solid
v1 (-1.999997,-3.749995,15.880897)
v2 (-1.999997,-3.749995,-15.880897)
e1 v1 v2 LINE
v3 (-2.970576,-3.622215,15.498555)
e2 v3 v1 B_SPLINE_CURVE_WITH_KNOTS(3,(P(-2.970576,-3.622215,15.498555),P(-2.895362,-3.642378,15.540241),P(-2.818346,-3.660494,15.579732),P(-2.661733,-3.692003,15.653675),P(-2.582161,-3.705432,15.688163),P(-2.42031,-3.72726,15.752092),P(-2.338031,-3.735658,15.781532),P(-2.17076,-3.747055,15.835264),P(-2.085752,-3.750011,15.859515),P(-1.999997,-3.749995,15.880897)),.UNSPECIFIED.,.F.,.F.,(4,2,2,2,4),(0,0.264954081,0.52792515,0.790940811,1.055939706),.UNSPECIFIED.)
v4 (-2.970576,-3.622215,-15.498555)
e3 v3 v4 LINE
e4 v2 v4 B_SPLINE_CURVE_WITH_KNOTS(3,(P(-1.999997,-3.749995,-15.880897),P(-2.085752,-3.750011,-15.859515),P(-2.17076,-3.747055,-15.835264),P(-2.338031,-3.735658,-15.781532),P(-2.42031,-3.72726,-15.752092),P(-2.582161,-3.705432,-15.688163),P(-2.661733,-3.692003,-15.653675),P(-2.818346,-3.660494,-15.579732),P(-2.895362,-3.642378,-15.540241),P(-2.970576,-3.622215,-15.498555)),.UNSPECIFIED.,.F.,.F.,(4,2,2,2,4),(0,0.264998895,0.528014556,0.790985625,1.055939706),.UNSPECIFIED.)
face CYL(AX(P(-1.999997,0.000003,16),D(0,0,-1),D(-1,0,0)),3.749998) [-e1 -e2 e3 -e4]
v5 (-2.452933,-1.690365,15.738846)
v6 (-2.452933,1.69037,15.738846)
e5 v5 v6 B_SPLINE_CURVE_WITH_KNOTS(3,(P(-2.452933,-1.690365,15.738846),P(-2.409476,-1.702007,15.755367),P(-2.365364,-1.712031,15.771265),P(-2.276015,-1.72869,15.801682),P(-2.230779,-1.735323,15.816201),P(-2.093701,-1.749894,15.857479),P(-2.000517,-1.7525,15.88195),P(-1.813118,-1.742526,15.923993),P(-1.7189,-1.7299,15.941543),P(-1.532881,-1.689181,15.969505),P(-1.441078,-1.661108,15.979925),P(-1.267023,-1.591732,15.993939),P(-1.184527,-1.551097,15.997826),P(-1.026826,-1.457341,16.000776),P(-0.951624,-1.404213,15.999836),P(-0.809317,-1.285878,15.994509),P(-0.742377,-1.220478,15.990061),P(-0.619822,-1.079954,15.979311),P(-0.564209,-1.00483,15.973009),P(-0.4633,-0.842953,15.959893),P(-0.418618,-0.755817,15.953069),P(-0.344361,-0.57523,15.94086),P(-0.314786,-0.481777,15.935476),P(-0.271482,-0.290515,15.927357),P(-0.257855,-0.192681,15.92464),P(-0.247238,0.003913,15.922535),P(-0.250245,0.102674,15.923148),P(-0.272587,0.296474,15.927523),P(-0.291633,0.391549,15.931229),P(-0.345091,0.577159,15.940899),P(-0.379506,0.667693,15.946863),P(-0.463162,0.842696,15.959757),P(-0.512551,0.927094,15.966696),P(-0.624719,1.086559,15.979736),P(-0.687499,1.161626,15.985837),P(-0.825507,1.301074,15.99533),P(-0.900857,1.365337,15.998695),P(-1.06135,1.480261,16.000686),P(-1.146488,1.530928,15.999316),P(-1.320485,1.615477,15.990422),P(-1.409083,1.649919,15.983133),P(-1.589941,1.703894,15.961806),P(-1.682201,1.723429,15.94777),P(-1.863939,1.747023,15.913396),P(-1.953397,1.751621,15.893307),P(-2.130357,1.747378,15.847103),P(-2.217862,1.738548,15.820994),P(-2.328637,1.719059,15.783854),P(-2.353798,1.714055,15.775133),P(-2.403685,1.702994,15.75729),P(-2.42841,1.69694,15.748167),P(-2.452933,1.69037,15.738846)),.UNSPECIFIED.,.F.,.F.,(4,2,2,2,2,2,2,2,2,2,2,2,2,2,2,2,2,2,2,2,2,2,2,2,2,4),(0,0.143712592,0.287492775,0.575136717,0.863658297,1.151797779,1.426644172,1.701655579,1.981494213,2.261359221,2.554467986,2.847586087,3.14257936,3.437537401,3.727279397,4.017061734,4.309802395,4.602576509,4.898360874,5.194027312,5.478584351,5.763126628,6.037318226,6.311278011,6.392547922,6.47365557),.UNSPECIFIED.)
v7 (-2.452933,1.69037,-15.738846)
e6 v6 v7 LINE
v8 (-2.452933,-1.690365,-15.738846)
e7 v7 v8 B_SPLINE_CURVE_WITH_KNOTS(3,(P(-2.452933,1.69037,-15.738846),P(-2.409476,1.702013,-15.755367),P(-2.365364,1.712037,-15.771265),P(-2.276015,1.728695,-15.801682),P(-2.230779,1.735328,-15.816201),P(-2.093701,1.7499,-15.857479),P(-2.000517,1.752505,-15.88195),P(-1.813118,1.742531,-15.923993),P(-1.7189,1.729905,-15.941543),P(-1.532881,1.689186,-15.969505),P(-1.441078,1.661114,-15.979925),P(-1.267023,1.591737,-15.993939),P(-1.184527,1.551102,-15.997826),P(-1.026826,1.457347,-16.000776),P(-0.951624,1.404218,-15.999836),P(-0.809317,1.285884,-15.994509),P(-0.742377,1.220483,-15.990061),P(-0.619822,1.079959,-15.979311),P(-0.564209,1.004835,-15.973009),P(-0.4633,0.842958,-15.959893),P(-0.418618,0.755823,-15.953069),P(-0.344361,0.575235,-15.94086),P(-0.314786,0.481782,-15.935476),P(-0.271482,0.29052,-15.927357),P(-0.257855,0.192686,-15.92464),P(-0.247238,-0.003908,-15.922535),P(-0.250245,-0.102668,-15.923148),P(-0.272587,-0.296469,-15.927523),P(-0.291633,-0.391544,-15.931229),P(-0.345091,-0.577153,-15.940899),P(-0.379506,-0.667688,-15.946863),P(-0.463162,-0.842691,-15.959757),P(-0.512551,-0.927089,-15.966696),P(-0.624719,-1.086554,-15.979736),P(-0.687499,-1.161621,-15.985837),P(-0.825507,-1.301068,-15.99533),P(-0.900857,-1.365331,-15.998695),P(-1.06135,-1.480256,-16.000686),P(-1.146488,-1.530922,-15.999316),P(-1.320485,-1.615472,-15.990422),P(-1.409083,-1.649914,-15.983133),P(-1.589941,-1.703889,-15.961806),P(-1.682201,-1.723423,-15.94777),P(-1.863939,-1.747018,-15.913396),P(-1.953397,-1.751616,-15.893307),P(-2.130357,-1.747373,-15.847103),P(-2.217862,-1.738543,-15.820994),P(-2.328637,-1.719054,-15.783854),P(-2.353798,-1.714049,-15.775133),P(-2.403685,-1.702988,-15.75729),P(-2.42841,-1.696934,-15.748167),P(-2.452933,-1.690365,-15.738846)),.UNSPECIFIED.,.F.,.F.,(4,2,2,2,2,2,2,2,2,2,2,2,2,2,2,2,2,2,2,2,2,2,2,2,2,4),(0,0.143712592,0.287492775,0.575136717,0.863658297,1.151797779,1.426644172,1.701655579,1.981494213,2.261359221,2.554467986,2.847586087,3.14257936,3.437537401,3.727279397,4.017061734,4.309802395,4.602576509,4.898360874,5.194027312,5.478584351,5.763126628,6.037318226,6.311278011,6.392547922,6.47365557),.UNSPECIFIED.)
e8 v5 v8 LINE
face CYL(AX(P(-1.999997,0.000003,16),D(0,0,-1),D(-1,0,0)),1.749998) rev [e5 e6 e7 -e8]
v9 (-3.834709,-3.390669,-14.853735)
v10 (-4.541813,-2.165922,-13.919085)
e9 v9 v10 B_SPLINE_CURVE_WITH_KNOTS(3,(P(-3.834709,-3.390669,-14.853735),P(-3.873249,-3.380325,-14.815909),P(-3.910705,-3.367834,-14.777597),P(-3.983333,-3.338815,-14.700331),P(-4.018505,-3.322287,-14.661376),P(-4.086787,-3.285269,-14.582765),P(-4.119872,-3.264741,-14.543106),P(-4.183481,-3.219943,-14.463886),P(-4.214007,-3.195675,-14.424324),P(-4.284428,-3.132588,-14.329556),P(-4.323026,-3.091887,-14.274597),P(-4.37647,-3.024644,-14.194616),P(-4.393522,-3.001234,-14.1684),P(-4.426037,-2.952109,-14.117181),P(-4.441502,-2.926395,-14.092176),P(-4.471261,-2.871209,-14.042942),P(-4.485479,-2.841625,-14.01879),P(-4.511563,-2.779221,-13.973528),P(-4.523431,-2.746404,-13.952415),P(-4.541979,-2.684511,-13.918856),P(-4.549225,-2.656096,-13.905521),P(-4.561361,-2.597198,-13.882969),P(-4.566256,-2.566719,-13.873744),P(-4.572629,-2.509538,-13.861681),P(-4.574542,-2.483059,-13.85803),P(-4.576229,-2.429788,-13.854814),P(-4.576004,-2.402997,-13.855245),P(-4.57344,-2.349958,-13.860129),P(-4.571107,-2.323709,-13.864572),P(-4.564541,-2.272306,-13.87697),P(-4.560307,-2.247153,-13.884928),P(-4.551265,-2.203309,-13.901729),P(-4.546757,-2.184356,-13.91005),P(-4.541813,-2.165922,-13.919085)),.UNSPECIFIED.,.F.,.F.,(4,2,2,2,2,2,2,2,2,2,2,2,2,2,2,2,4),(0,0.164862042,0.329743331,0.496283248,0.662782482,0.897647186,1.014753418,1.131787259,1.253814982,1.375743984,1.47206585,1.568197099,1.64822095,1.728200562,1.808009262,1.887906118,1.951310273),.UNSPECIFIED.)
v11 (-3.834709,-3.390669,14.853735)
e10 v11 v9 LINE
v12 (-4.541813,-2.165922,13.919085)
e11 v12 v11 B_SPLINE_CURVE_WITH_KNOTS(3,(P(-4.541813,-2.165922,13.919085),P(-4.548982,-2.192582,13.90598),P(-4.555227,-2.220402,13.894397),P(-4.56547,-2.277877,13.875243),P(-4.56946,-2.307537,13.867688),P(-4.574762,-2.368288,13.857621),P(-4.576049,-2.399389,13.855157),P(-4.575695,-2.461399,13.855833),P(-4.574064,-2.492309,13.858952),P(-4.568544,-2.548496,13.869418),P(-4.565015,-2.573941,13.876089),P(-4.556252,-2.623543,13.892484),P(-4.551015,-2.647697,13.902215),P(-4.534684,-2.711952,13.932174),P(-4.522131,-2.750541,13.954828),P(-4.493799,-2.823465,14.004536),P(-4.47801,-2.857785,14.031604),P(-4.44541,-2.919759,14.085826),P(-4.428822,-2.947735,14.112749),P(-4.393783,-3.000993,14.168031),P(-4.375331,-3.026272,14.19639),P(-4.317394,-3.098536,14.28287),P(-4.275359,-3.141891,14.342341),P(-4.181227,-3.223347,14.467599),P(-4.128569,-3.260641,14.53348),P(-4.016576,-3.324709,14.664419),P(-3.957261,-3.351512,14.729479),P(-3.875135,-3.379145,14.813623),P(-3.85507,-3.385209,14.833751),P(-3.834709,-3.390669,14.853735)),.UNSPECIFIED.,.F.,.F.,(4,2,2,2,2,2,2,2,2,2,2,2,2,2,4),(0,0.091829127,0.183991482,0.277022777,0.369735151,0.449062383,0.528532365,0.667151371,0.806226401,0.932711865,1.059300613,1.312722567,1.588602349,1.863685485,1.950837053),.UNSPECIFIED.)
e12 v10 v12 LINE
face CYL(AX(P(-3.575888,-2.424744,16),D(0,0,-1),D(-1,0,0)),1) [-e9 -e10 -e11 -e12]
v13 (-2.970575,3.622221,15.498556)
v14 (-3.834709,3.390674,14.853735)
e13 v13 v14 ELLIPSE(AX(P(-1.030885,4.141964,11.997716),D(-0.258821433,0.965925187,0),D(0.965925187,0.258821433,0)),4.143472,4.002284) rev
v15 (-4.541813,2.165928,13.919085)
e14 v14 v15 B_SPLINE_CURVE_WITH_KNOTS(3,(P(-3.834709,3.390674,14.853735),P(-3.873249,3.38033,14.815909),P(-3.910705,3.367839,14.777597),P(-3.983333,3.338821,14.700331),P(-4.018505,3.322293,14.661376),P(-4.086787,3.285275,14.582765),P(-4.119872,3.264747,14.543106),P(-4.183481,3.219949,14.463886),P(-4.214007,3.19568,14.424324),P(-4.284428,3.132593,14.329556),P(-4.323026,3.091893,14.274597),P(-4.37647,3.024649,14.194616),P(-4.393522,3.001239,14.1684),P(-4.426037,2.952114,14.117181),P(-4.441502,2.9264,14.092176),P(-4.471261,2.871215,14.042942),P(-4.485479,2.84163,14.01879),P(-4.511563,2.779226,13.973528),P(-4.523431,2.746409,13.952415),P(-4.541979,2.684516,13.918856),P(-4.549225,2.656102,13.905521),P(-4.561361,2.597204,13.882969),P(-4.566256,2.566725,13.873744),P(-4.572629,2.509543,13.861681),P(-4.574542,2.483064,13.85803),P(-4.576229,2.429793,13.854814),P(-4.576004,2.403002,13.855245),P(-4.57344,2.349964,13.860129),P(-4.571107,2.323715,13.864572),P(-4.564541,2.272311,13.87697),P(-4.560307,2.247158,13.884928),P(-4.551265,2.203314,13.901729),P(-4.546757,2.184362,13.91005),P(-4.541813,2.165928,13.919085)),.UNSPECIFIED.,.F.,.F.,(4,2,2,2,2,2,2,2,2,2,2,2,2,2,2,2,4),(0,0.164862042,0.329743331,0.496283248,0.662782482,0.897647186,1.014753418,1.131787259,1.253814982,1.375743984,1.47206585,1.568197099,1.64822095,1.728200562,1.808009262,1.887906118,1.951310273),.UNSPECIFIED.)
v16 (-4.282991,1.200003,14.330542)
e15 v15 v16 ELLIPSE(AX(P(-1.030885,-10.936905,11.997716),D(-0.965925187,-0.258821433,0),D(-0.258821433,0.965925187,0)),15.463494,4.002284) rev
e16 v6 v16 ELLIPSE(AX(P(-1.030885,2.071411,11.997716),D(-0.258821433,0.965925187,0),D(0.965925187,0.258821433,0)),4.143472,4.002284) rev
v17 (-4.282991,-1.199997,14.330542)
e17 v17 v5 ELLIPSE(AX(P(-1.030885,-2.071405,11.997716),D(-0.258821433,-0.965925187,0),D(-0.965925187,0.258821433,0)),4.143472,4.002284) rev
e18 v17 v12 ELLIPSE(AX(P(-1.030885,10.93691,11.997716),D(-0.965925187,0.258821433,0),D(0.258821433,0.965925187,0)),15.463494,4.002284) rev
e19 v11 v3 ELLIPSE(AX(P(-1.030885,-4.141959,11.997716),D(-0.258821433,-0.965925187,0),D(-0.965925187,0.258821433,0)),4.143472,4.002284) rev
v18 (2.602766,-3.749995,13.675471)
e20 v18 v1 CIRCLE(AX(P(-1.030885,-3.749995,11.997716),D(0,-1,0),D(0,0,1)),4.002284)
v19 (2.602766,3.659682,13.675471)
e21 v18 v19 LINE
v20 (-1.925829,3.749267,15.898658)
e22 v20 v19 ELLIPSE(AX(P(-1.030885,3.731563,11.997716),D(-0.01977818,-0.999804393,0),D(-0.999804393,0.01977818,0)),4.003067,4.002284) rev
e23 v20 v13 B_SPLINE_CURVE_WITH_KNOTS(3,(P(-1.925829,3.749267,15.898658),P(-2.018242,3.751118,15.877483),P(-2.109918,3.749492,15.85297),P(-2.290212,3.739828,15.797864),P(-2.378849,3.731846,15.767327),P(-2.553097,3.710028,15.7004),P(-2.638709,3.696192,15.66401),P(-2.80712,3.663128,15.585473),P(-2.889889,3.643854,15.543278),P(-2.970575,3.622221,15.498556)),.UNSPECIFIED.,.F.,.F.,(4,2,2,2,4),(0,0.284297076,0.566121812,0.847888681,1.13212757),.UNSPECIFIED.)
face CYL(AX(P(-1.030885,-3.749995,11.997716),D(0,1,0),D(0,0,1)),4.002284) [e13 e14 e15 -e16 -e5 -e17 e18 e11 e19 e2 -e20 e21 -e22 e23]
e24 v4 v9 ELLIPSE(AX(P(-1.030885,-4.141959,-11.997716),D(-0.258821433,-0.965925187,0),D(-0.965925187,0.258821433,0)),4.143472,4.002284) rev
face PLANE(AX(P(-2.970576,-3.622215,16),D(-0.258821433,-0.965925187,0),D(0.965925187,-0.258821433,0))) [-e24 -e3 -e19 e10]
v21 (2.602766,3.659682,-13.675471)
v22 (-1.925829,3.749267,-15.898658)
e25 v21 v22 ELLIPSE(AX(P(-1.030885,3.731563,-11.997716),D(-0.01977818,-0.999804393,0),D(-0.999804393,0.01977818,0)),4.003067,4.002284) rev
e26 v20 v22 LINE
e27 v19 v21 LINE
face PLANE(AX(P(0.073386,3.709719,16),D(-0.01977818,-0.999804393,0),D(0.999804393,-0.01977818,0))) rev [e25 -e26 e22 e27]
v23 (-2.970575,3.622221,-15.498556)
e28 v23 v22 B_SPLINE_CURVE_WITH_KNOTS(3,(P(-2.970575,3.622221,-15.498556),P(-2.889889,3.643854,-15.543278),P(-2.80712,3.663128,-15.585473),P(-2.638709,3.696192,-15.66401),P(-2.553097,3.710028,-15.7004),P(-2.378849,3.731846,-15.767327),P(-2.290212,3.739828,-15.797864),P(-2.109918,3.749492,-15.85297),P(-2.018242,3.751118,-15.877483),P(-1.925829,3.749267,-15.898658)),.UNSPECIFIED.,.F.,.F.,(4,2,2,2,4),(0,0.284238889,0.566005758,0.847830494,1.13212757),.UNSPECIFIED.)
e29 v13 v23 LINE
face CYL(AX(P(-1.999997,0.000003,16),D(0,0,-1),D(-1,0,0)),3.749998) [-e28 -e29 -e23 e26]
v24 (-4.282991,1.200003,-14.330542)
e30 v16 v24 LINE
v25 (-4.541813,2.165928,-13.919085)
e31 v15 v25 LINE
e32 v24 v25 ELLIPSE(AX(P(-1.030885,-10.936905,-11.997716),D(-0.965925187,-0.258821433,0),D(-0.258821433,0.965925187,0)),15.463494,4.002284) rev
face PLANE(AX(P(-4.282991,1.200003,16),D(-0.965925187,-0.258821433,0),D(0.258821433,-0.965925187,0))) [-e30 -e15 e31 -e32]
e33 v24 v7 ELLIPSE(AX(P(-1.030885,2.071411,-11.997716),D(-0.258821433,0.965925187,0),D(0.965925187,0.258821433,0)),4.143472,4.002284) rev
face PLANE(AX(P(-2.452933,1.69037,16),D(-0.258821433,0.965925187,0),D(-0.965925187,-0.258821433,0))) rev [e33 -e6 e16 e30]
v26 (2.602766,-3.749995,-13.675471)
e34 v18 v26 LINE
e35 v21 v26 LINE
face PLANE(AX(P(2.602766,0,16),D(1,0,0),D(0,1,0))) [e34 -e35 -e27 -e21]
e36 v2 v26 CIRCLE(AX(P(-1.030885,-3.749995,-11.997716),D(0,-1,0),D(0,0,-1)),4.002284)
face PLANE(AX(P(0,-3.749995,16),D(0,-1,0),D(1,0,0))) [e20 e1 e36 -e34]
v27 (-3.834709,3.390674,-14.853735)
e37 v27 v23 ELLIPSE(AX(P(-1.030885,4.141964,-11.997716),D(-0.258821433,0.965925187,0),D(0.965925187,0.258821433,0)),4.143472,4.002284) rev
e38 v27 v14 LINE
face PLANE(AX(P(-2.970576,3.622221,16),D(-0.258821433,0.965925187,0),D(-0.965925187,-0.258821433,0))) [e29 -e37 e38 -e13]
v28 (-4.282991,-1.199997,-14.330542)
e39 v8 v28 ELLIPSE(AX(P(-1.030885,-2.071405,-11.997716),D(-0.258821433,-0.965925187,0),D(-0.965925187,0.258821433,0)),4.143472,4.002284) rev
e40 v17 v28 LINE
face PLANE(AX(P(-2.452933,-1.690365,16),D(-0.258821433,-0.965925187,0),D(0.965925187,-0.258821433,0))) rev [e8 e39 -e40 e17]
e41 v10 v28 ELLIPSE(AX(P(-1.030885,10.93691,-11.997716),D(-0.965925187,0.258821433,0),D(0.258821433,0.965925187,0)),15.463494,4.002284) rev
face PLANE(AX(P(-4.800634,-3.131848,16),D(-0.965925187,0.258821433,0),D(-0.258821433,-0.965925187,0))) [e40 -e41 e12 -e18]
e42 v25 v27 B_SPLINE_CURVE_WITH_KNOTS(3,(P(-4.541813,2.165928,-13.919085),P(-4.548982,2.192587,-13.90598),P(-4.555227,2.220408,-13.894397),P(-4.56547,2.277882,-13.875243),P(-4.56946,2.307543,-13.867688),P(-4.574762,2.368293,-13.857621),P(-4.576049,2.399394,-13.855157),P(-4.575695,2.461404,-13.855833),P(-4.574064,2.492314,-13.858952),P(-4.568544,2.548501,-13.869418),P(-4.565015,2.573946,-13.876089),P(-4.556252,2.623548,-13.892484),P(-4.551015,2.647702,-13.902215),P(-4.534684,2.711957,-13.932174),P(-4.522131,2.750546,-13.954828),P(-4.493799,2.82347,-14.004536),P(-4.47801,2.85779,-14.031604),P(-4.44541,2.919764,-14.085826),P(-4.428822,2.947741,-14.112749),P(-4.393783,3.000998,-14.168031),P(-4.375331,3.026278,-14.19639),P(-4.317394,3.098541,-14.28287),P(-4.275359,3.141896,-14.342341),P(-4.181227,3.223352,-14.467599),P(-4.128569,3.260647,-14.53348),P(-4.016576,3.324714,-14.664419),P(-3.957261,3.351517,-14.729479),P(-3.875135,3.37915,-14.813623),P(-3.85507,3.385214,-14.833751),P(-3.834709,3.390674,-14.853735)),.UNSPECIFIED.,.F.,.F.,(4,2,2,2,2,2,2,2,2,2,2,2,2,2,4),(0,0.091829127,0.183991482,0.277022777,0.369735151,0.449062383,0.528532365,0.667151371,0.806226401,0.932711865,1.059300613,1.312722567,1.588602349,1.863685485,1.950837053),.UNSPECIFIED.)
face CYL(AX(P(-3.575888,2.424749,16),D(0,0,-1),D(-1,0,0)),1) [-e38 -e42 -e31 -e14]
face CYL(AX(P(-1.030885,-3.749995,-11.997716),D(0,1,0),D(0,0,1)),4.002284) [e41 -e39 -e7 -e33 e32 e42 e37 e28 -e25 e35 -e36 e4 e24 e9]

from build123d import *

# Parameters (mm, degrees)
EXTRUDE_THIN1_DEPTH     = 16
BOSS_EXTRUDE2_DEPTH     = 16
FILLET1_R               = 1
CUT_EXTRUDE2_DEPTH      = 18.058758847
CUT_EXTRUDE2_DEPTH_BACK = 18.058758847


# Read off the part's stored shape, not the designer's step: Imported1
with BuildPart() as part:
    # Sketch2 → Extrude-Thin1 (new, symmetric)
    with BuildSketch(Plane.XY):
        with BuildLine():
            Line((-4.282991407, -1.199997312), (-2.45293323, -1.69036477))
            ThreePointArc((-2.45293323, -1.69036477), (-0.24999913, 2.688e-06), (-2.45293323, 1.690370147))
            Line((-2.45293323, 1.690370147), (-4.282991407, 1.200002688))
            Line((-4.282991407, 1.200002688), (-4.800634272, 3.131853062))
            Line((-4.800634272, 3.131853062), (-2.970575647, 3.62222064))
            ThreePointArc((-2.970575647, 3.62222064), (1.75000087, 2.688e-06), (-2.970575649, -3.622215263))
            Line((-2.970575649, -3.622215263), (-4.800634272, -3.131847685))
            Line((-4.800634272, -3.131847685), (-4.282991407, -1.199997312))
        make_face()
    extrude(amount=EXTRUDE_THIN1_DEPTH, both=True)

    # Sketch4 → Boss-Extrude2 (add, symmetric)
    with BuildSketch(Plane.XY):
        with BuildLine():
            Line((2.602765718, -3.74999537), (2.602765718, 3.659682334))
            Line((2.602765718, 3.659682334), (-1.925829051, 3.749267219))
            ThreePointArc((-1.925829051, 3.749267219), (1.749817484, -0.037083193), (-1.999997188, -3.74999537))
            Line((-1.999997188, -3.74999537), (2.602765718, -3.74999537))
        make_face()
    extrude(amount=BOSS_EXTRUDE2_DEPTH, both=True)

    # Fillet1
    fillet1_edges = [part.edges().sort_by_distance(p)[0] for p in [
        (-4.800634272, 3.131853062, 0),
        (-4.800634272, -3.131847685, 0),
    ]]
    fillet(fillet1_edges, radius=FILLET1_R)

    # Sketch3 → Cut-Extrude2 (cut, two sides: drawn at the far end of the back side and taken through both)
    with BuildSketch(Plane(origin=(0, 0, 0), x_dir=(1, 0, 0), z_dir=(0, 1, 0)).offset(-CUT_EXTRUDE2_DEPTH_BACK)):
        with BuildLine():
            Line((2.738864814, 13.342061251), (2.738864814, 18.762901752))
            Line((2.738864814, 18.762901752), (-4.800634272, 18.762901752))
            Line((-4.800634272, 18.762901752), (-4.800634272, 13.342061251))
            ThreePointArc((-4.800634272, 13.342061251), (-1.030884729, 16), (2.738864814, 13.342061251))
        make_face()
        with BuildLine():
            Line((-4.800634272, -18.762901752), (-4.800634272, -13.342061251))
            ThreePointArc((-4.800634272, -13.342061251), (-1.030884729, -16), (2.738864814, -13.342061251))
            Line((2.738864814, -13.342061251), (2.738864814, -18.762901752))
            Line((2.738864814, -18.762901752), (-4.800634272, -18.762901752))
        make_face()
    extrude(amount=CUT_EXTRUDE2_DEPTH + CUT_EXTRUDE2_DEPTH_BACK, mode=Mode.SUBTRACT)


solid = part.part
